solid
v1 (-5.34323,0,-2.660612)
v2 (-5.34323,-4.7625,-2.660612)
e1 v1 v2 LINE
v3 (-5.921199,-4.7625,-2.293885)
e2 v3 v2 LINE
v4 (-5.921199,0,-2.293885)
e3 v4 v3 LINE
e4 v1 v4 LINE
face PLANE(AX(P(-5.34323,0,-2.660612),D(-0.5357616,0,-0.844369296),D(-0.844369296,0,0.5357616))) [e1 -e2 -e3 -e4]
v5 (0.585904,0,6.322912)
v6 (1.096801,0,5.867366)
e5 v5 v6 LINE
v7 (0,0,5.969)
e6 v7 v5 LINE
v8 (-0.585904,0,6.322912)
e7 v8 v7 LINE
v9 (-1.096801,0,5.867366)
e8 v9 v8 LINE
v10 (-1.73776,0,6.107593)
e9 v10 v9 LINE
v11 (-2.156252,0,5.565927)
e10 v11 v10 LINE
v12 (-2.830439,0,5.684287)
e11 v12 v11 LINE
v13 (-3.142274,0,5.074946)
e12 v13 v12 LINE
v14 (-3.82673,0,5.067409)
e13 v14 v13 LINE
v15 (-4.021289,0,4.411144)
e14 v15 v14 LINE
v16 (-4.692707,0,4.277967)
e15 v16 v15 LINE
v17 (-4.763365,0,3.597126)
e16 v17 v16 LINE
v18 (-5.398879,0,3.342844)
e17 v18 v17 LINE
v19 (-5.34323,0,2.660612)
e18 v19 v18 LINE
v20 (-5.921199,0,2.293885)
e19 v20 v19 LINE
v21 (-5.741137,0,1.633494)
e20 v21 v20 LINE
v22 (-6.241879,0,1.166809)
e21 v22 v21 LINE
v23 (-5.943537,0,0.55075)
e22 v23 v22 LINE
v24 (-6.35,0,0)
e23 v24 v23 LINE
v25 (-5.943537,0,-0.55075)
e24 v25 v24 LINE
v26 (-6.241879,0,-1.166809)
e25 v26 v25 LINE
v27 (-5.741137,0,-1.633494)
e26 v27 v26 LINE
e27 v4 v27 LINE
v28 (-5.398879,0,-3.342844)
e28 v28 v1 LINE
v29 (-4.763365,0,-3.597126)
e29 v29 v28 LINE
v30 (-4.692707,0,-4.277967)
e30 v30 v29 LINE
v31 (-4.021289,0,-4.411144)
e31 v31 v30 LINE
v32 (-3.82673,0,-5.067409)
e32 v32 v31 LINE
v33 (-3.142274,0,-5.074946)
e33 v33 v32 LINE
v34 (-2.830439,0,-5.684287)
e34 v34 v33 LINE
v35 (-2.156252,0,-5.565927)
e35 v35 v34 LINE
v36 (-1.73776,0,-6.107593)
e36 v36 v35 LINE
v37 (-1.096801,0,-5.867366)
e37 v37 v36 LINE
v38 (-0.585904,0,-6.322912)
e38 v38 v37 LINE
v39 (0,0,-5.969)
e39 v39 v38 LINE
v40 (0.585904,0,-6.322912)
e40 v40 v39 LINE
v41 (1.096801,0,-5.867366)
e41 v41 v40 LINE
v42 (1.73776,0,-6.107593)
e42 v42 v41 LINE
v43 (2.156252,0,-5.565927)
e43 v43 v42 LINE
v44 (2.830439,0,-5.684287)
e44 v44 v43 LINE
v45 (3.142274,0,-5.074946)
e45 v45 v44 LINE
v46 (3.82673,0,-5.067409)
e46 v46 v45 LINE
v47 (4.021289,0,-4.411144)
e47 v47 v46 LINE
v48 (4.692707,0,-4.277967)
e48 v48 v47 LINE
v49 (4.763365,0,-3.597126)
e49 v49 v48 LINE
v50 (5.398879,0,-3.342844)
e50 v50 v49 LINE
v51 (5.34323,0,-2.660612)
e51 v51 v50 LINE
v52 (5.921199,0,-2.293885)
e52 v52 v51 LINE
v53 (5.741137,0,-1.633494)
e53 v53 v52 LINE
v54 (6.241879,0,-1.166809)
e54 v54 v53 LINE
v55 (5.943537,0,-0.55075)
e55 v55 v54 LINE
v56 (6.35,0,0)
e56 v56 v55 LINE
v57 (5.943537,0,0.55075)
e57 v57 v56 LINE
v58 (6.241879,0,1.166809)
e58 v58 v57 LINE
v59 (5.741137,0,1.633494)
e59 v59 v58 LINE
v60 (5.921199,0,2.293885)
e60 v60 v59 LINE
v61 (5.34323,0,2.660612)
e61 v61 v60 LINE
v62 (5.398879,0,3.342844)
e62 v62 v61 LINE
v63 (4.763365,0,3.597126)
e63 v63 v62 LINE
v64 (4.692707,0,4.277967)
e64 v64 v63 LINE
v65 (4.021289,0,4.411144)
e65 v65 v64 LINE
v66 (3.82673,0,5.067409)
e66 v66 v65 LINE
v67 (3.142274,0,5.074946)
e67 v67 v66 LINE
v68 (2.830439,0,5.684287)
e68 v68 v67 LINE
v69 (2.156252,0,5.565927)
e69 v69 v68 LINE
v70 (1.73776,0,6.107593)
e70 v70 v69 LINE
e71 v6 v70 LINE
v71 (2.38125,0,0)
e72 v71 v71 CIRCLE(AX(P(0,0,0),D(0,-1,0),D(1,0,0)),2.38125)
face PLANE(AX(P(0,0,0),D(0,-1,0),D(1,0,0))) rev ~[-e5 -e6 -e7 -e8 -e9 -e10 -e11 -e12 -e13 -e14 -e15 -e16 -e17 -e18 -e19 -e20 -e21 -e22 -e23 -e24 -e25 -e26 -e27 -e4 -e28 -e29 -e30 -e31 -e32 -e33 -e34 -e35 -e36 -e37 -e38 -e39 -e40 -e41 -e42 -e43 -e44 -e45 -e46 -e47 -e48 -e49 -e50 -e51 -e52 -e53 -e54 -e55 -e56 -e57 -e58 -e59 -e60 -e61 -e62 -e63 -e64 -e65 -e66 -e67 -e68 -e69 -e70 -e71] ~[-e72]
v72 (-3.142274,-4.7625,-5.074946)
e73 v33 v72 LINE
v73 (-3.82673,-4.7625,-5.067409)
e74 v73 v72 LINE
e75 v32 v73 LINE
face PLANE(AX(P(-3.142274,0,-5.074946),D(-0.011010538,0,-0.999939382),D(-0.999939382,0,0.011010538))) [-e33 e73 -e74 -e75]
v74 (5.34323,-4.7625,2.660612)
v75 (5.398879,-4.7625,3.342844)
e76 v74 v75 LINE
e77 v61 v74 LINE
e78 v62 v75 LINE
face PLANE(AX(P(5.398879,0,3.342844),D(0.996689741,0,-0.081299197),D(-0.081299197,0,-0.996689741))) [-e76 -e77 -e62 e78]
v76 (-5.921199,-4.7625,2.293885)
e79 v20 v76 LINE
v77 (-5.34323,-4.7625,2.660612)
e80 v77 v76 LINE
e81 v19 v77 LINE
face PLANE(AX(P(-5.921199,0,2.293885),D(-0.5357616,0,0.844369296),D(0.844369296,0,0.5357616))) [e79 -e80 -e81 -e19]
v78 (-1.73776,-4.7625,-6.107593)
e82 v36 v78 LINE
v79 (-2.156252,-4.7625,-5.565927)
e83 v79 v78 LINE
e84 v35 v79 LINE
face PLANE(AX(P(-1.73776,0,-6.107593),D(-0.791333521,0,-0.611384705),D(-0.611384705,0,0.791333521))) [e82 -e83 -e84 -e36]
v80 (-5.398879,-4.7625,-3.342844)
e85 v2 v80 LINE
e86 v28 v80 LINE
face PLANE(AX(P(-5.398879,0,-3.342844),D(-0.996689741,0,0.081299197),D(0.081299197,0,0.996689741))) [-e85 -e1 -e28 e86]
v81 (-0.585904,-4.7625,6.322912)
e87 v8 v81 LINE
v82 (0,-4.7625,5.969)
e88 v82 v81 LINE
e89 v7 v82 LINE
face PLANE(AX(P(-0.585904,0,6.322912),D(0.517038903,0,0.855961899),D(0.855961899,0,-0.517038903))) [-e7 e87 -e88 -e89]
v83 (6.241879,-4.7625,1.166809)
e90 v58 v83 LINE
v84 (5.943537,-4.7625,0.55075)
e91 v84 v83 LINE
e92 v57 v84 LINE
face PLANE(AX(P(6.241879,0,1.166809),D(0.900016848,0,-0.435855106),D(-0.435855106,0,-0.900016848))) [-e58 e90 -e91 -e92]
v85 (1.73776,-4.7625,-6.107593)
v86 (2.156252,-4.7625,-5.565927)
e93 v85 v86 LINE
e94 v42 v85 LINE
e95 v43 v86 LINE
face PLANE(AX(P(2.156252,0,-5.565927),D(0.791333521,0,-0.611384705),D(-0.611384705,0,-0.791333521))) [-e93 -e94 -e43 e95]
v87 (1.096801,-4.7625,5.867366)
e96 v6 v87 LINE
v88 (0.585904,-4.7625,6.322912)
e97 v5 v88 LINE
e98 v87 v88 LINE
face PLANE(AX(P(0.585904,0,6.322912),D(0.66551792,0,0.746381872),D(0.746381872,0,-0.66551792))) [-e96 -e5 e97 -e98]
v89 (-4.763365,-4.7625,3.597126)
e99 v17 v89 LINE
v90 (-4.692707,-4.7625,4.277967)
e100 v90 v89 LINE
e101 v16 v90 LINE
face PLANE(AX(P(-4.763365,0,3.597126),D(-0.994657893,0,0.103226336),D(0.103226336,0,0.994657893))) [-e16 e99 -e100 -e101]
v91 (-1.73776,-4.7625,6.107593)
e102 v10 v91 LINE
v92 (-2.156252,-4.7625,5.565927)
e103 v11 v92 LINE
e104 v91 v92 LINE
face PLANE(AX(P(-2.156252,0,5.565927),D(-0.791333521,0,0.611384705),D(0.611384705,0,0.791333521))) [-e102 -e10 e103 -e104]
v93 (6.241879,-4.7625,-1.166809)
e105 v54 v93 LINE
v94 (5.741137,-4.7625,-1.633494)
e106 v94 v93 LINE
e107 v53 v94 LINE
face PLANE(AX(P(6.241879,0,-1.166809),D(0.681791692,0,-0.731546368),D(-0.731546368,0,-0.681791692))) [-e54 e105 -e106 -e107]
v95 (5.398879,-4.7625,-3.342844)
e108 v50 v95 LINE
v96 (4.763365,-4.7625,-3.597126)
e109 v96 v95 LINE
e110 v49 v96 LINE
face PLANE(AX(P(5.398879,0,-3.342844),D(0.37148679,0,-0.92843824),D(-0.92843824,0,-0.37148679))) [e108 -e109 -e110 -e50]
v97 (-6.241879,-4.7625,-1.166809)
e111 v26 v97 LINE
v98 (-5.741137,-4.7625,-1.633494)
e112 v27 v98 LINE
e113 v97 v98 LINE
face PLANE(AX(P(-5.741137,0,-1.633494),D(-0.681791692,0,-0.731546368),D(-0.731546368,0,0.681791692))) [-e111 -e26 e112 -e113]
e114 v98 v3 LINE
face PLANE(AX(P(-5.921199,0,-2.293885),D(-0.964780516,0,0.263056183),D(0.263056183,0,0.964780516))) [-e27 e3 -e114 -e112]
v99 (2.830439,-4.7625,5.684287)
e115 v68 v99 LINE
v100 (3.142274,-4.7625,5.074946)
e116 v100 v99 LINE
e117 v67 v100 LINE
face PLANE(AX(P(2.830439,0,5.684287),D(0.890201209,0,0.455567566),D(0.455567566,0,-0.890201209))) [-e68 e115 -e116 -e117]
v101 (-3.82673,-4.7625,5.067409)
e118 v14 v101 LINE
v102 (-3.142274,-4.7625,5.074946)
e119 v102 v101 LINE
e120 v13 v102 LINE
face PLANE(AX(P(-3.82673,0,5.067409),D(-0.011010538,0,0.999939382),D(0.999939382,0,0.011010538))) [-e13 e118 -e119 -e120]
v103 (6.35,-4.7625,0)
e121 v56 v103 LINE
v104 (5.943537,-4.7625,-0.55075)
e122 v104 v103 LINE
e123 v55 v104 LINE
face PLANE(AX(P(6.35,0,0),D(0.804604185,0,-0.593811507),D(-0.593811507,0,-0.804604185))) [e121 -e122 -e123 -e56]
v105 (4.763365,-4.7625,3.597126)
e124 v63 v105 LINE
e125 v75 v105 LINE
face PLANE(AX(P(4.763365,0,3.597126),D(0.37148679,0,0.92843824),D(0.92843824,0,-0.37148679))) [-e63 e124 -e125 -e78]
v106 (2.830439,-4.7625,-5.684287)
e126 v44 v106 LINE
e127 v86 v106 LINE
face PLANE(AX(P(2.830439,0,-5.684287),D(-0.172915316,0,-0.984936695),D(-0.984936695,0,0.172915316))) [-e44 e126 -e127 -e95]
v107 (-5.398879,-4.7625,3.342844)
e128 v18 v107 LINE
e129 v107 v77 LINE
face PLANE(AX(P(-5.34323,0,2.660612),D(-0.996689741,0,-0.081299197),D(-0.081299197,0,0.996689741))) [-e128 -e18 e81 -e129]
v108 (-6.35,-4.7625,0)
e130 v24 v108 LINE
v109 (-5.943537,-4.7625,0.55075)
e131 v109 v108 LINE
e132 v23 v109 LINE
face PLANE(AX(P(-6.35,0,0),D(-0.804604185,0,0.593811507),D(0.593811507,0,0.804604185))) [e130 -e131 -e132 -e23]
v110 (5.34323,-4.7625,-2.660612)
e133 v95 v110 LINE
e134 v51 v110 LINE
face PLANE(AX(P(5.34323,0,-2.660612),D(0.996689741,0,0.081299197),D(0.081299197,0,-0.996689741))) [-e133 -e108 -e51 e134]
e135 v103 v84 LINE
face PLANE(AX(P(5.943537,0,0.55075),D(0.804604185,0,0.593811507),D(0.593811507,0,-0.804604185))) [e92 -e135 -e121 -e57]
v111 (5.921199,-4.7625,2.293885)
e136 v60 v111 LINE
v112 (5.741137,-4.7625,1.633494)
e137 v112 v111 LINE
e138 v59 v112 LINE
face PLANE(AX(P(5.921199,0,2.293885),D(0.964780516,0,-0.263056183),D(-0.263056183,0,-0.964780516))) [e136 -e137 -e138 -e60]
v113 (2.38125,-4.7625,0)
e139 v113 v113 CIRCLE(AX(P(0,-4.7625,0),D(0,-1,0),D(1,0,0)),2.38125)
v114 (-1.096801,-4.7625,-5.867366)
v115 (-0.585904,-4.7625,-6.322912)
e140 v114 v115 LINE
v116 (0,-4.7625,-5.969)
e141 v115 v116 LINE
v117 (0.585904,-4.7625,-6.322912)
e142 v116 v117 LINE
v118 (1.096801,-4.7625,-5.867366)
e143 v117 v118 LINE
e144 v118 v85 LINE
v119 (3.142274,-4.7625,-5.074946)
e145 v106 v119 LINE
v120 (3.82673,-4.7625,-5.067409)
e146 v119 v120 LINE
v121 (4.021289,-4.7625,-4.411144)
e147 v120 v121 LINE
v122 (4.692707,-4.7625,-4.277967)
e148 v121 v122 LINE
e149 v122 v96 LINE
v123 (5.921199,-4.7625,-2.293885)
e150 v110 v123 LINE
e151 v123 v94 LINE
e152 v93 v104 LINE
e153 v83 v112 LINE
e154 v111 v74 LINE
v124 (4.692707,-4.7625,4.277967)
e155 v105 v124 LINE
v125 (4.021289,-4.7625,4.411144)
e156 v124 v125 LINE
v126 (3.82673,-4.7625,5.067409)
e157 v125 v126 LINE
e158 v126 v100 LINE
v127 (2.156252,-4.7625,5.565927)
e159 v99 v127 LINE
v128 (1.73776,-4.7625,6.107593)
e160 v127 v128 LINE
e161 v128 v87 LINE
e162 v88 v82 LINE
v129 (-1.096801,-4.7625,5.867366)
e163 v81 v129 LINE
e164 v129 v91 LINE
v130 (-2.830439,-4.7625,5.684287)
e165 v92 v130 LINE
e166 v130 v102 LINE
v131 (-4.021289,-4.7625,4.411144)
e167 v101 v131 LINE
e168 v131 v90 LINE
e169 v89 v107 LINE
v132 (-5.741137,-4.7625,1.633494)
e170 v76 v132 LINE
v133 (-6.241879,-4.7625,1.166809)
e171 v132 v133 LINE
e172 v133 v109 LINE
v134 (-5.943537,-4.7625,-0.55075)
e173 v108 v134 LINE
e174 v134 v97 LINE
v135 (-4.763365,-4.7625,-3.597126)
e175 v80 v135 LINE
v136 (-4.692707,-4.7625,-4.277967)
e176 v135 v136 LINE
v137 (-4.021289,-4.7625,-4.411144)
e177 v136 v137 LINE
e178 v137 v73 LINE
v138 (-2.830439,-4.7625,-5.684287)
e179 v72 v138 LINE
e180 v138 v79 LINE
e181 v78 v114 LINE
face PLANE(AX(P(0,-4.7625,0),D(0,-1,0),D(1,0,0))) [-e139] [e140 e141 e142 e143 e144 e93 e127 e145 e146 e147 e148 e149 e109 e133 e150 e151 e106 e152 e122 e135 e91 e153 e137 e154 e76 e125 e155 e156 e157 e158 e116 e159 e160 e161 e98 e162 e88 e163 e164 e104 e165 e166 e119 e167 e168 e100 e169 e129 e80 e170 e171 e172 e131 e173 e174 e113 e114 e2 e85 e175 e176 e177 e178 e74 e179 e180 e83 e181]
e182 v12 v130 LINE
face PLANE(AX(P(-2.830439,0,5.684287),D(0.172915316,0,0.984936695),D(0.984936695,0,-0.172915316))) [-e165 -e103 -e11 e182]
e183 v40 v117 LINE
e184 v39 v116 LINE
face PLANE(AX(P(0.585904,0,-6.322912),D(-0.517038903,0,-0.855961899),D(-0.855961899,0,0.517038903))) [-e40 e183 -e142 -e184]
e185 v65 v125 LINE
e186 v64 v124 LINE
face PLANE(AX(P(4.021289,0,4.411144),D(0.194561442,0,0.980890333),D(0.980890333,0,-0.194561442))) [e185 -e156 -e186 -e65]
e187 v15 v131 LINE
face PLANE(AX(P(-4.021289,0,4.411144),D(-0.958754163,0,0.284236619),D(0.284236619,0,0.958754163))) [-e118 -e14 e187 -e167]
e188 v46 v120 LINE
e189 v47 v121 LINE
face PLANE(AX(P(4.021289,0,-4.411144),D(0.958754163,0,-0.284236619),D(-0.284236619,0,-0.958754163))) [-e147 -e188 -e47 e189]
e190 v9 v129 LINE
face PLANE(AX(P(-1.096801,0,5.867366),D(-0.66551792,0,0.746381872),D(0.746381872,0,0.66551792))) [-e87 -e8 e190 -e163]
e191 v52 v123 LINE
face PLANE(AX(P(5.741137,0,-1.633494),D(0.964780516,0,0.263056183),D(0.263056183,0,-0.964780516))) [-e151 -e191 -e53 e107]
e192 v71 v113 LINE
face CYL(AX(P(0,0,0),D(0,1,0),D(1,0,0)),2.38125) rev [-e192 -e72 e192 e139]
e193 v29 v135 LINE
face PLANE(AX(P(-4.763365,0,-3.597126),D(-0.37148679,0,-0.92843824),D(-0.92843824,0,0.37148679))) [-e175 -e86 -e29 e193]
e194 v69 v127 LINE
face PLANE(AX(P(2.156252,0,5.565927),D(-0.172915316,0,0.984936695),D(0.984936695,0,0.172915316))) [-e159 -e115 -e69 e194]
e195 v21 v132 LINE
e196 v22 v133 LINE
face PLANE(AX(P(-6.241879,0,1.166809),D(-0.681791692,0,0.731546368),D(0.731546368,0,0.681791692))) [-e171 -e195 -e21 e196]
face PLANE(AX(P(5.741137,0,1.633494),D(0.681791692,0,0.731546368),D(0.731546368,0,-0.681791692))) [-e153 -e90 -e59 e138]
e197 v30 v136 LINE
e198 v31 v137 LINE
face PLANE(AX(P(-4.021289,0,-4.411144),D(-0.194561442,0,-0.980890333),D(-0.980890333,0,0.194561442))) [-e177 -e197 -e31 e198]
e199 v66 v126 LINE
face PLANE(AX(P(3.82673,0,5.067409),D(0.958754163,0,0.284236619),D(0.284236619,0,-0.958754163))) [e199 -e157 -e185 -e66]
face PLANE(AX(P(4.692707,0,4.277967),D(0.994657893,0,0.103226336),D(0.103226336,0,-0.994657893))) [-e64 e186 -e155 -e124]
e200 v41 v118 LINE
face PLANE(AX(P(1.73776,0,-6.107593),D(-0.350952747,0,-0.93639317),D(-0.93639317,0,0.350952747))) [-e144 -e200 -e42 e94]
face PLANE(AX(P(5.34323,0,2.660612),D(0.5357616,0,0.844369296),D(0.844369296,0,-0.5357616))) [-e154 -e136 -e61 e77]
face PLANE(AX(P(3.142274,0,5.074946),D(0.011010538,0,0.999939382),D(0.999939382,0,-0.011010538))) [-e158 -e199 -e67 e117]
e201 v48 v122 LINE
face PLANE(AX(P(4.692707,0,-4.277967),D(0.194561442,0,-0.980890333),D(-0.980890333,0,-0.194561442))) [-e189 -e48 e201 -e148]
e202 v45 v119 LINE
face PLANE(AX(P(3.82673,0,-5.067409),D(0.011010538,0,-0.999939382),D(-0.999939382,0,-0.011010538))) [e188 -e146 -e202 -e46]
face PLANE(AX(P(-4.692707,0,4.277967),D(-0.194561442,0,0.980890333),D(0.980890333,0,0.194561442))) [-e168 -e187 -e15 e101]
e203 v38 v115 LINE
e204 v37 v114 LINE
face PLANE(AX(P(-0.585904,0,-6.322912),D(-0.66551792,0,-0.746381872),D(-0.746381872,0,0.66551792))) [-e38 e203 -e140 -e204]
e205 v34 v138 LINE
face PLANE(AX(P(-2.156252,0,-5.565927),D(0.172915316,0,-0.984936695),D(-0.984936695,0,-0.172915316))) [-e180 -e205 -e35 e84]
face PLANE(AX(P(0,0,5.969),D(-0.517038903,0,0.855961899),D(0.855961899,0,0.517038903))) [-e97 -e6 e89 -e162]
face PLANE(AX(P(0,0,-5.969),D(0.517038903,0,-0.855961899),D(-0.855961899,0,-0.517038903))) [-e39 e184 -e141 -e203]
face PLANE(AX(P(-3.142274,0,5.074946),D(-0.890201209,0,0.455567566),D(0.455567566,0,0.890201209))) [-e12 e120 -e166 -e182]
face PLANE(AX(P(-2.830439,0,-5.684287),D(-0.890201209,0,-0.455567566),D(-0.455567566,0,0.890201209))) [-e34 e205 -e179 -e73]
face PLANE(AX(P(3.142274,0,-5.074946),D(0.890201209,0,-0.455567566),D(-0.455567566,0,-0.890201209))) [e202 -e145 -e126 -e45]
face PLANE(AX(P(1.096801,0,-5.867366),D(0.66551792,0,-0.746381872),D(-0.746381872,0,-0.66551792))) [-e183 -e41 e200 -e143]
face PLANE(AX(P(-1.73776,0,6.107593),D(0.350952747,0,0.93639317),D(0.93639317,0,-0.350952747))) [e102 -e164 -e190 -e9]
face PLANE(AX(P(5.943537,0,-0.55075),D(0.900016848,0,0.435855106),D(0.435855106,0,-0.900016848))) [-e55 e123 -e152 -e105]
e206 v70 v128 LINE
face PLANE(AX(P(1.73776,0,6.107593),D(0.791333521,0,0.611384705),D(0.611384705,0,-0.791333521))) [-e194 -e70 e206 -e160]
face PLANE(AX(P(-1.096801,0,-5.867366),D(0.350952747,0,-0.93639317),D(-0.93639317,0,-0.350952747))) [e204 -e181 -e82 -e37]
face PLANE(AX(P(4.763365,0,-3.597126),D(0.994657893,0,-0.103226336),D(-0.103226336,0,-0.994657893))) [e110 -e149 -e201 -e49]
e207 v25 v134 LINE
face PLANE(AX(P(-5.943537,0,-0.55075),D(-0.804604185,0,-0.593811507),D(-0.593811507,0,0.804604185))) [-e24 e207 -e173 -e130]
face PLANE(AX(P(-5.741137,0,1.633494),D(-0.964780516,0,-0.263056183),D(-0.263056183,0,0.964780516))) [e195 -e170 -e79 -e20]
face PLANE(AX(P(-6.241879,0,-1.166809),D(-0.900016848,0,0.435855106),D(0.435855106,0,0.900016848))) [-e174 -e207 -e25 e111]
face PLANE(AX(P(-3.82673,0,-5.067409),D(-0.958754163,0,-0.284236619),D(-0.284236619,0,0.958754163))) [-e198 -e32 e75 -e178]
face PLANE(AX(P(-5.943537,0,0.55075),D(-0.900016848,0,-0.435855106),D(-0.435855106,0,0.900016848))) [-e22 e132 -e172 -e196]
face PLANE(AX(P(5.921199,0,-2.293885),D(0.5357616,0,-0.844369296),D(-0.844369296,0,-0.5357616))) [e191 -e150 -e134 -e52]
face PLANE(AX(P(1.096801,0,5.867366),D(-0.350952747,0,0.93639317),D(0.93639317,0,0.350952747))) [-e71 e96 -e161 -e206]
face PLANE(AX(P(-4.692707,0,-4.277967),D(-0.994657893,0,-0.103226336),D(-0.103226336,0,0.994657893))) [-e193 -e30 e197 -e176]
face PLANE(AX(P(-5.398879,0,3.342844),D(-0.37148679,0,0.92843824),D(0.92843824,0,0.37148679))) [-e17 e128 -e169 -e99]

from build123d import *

# Parameters (mm, degrees)
F0_R            = 6.35
F0_R_2          = 2.38125
F1_DEPTH        = 4.7625
F3_DEPTH        = 4.7635
F3_COPIES_COUNT = 34


# Not quite as in the source:
# - a pattern or mirror of a feature is missing from the dataset's text; its kind, count and spacing are read off the source's solid


with BuildPart() as f1:
    # F0 (on Front) → F1 (new body)
    with BuildSketch(Plane.XZ):
        Circle(F0_R)
        Circle(F0_R_2, mode=Mode.SUBTRACT)
    extrude(amount=F1_DEPTH)

    # F2 (on Front) → F3 (cut, through all)
    with BuildSketch(Plane.XZ):
        with BuildLine():
            Line((-0.5859040826, 6.3229120195), (0, 5.969))
            Line((0, 5.969), (0.5859040826, 6.3229120195))
            ThreePointArc((0.5859040826, 6.3229120195), (0, 6.4661394577), (-0.5859040826, 6.3229120195))
        make_face()
    f3 = extrude(amount=F3_DEPTH, mode=Mode.SUBTRACT)

    # F3_copies: F3 ×34 about axis
    f3_copies_axis = Axis((0, 0, 0), (0, 1, 0))
    for i in range(1, F3_COPIES_COUNT):
        add(f3.rotate(f3_copies_axis, i * 360 / F3_COPIES_COUNT), mode=Mode.SUBTRACT)


solid = f1.part
